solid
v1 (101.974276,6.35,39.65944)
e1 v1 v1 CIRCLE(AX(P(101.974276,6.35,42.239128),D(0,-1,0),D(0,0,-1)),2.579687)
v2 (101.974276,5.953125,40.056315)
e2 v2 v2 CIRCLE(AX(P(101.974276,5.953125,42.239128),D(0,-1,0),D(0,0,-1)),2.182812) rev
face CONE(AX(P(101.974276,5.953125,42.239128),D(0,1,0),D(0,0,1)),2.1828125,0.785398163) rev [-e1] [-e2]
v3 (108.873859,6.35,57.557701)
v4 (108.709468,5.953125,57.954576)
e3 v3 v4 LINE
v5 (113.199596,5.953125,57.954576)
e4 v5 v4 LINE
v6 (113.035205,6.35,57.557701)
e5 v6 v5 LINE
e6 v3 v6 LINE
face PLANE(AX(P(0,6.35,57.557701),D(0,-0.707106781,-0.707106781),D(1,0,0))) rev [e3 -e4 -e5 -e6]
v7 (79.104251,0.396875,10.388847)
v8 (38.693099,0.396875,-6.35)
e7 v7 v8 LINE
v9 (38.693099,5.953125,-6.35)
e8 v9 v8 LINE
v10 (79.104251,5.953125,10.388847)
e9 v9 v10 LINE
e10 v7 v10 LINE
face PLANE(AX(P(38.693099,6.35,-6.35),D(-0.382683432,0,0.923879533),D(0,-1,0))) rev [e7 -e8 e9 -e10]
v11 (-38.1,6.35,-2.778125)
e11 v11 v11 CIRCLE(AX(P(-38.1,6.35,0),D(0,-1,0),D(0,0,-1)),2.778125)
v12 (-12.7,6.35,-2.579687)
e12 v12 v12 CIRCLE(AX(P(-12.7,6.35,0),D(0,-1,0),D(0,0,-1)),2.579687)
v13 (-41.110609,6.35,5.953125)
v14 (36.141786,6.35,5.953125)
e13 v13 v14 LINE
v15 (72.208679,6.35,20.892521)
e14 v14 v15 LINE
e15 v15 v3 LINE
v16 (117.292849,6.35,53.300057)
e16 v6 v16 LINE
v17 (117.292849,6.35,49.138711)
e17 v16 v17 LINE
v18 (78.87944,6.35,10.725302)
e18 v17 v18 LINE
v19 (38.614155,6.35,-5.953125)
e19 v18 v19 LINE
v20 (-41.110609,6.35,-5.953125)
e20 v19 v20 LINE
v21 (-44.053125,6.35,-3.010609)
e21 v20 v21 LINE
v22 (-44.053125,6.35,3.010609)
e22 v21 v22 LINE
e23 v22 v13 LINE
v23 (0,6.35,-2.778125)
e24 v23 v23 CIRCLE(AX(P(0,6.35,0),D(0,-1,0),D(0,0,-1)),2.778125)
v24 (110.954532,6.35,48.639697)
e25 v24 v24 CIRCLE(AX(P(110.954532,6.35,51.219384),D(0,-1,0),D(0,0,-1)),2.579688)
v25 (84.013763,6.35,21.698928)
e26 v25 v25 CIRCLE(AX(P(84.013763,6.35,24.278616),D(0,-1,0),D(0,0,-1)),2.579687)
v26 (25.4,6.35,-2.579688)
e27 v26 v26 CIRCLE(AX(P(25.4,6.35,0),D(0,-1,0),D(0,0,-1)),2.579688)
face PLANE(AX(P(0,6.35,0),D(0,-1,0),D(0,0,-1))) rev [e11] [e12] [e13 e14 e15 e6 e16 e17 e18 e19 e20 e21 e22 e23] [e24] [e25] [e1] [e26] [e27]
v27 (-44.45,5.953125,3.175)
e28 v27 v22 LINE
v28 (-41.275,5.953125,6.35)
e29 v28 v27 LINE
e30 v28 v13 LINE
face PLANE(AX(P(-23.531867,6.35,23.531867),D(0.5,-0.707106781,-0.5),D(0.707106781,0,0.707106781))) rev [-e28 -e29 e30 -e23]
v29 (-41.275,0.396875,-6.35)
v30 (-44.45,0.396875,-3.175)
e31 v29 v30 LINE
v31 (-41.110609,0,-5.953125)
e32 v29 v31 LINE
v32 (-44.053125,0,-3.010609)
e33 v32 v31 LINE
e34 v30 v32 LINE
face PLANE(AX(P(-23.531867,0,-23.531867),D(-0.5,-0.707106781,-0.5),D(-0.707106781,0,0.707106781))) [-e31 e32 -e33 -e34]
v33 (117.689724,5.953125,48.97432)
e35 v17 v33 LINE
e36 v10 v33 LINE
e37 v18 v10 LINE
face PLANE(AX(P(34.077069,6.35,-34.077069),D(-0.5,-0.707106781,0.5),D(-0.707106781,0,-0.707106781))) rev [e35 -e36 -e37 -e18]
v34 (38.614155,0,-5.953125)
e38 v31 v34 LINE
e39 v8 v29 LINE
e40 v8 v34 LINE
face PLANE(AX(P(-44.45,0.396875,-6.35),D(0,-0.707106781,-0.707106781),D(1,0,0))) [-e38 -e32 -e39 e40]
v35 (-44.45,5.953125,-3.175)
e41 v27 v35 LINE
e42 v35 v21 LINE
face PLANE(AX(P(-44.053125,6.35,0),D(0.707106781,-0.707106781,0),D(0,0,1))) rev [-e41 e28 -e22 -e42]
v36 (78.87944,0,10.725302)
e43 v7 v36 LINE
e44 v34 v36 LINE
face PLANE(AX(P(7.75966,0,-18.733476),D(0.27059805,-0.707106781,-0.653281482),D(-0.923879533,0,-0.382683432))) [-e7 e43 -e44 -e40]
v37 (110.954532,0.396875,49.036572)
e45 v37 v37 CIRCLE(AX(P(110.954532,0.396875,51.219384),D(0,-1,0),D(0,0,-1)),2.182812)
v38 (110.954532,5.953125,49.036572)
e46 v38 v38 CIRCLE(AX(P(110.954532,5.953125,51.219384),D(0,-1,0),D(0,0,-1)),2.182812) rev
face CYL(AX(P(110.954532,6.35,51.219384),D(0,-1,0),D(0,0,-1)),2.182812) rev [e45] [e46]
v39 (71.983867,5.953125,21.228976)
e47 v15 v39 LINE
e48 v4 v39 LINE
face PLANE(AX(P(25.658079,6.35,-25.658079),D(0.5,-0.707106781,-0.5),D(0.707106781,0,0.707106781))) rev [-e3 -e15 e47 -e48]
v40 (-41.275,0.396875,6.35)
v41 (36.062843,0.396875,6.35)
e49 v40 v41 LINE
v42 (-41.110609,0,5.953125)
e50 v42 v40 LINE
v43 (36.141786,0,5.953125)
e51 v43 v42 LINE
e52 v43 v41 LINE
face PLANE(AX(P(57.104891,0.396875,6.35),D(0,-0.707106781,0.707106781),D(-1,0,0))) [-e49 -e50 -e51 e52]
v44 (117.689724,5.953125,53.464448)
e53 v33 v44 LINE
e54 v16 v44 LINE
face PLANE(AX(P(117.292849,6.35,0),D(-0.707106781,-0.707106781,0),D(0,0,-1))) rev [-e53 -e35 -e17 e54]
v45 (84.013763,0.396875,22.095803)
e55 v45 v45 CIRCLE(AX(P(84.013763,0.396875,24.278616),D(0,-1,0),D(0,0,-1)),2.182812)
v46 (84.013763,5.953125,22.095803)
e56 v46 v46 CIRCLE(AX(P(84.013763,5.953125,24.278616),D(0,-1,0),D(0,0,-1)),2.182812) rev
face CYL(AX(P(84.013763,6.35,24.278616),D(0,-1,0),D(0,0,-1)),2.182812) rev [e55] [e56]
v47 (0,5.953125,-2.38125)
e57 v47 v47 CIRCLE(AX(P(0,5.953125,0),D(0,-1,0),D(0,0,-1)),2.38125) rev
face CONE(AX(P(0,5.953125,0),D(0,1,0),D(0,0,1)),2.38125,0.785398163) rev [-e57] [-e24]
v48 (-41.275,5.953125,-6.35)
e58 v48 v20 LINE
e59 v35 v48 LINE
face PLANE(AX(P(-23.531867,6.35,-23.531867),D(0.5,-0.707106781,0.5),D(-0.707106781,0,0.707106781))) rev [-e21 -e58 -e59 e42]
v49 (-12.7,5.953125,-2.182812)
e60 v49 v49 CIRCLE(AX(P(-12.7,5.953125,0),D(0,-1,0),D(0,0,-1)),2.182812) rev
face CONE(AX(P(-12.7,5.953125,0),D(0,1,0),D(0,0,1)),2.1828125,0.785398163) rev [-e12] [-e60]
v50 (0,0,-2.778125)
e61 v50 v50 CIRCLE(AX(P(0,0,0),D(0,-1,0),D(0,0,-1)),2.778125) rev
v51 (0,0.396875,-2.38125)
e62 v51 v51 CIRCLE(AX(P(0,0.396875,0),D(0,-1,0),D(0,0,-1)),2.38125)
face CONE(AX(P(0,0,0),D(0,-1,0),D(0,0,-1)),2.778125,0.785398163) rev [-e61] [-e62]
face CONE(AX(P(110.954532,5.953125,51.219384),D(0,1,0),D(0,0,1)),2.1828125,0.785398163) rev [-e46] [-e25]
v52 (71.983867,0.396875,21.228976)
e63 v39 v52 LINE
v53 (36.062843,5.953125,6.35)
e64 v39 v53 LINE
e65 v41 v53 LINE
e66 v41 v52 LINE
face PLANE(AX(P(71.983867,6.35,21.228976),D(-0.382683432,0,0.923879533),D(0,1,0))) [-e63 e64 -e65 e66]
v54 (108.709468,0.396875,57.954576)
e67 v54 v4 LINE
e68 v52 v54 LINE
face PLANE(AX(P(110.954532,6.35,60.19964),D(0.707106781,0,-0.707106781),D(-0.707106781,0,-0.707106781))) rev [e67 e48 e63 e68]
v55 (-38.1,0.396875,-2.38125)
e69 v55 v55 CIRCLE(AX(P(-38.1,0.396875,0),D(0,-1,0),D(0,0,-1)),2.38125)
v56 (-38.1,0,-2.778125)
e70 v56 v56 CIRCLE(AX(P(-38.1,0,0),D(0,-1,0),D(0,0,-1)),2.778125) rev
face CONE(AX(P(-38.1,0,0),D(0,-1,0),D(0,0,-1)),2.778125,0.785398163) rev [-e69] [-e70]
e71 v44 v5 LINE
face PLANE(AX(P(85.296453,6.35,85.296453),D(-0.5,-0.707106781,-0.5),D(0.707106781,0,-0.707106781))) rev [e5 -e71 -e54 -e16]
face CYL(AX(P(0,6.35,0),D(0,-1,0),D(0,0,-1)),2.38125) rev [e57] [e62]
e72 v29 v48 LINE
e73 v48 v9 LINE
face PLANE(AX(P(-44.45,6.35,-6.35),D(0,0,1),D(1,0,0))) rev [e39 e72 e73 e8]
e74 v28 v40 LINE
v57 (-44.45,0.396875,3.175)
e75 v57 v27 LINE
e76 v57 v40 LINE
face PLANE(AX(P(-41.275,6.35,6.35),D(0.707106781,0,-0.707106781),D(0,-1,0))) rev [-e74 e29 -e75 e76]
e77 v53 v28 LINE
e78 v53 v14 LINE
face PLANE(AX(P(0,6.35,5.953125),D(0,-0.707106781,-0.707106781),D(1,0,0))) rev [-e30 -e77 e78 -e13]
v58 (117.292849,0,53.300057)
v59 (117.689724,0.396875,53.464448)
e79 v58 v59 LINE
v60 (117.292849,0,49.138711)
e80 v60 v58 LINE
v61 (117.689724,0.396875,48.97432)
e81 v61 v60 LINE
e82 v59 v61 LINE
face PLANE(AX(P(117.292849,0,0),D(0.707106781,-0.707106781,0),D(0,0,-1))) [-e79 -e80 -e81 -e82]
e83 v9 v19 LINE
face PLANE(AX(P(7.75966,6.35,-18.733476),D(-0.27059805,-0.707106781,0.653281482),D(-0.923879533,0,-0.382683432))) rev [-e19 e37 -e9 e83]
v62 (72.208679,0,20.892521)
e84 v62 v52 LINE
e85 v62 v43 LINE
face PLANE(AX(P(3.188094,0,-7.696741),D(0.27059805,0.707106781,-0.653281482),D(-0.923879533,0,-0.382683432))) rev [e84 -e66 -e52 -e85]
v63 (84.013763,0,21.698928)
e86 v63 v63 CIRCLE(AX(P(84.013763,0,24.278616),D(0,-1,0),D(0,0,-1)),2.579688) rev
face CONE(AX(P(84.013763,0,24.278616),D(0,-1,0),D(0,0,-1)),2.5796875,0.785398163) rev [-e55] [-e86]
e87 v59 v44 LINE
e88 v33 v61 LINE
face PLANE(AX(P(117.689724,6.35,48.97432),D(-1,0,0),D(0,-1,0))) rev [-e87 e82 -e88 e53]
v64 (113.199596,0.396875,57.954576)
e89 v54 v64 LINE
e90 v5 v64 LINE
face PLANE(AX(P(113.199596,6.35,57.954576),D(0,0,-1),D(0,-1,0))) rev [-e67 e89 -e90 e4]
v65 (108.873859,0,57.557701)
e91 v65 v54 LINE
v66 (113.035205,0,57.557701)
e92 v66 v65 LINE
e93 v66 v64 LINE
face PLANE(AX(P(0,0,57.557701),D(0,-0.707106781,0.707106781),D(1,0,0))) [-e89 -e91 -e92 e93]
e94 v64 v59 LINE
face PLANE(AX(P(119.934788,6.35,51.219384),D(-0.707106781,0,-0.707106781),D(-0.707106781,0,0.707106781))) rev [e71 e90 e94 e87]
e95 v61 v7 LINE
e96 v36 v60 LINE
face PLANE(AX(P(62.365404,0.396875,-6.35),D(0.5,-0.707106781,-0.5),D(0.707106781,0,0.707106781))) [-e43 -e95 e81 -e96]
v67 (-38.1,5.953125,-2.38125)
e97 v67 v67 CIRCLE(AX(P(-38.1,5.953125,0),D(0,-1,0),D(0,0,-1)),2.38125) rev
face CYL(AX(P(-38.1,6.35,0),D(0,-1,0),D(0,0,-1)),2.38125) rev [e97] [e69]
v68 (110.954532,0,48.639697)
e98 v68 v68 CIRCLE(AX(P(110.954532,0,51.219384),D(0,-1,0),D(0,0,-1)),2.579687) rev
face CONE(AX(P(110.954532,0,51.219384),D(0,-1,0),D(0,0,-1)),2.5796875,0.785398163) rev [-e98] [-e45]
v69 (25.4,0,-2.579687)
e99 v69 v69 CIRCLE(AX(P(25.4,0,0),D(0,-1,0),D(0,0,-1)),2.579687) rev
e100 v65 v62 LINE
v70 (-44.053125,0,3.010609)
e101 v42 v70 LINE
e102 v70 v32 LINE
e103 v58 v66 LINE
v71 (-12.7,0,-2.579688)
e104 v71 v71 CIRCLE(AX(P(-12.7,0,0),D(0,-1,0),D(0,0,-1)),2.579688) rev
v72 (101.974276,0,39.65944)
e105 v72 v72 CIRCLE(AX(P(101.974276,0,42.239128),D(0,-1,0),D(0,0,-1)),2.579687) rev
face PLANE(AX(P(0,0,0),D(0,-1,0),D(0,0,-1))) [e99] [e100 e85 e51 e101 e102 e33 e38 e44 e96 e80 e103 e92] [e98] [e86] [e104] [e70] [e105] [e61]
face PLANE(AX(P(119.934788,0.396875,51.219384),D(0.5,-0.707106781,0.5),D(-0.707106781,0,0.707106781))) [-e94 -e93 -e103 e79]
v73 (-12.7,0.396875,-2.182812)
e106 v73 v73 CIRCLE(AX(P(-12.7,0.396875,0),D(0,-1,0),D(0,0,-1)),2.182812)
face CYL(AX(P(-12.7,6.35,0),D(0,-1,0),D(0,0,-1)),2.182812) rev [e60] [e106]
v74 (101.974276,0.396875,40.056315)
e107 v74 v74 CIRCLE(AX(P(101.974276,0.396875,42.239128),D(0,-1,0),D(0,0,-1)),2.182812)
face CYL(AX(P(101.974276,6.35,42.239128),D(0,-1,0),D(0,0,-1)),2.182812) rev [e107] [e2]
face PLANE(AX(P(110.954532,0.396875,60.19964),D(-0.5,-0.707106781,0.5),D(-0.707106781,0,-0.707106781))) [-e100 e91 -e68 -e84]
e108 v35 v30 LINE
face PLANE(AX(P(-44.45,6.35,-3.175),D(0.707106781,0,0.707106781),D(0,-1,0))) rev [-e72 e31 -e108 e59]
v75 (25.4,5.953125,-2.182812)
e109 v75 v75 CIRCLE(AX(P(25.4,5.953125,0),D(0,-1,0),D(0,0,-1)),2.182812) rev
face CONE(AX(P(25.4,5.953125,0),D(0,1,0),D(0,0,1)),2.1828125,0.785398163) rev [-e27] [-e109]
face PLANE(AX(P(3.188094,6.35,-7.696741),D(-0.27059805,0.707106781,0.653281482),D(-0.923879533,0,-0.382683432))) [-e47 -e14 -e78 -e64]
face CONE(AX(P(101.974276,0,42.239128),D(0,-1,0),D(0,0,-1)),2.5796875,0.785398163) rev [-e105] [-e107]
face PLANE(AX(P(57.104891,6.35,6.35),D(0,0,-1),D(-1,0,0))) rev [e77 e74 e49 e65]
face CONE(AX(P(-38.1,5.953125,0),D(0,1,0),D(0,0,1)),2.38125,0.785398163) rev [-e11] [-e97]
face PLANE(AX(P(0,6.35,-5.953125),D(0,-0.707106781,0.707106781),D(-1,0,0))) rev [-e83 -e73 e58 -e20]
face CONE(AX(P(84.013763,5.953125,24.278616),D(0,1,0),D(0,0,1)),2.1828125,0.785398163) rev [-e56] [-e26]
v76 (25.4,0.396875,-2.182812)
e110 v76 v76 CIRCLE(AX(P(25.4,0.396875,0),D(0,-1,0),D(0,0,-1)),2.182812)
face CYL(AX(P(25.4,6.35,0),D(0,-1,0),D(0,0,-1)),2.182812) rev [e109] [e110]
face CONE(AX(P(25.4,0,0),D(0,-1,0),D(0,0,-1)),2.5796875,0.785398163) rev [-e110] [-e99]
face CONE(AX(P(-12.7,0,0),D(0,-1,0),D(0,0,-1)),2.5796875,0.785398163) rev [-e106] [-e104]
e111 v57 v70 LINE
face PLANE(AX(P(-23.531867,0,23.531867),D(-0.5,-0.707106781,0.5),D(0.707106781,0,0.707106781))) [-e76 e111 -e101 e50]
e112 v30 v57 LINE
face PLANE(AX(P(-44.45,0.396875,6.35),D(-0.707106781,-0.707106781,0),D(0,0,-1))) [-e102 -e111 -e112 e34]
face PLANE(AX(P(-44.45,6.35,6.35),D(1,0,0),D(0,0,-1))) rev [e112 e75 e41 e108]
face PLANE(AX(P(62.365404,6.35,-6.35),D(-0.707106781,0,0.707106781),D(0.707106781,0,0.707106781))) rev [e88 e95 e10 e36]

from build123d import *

# Parameters (mm, degrees)
SKETCH1_R           = 2.38125
SKETCH1_R_2         = 2.1828125
BOSS_EXTRUDE1_DEPTH = 6.35
CHAMFER1_SIZE       = 3.175
CHAMFER2_SIZE       = 0.396875


with BuildPart() as part:
    # Sketch1 → Boss-Extrude1 (new body)
    with BuildSketch(Plane(origin=(0, 0, 0), x_dir=(1, 0, 0), z_dir=(0, 1, 0))):
        Polygon((-44.45, 6.35), (62.365403734, 6.35), (119.934787808, -51.219384074), (110.954531687, -60.199640195), (57.104891492, -6.35), (-44.45, -6.35), align=None)
        with Locations(Location((-38.1, 0, 0), (0, 0, 270))):
            Circle(SKETCH1_R, mode=Mode.SUBTRACT)
        with Locations(Location((0, 0, 0), (0, 0, 270))):
            Circle(SKETCH1_R, mode=Mode.SUBTRACT)
        with Locations(Location((110.954531687, -51.219384074, 0), (0, 0, 270))):
            Circle(SKETCH1_R_2, mode=Mode.SUBTRACT)
        with Locations(Location((101.974275566, -42.239127953, 0), (0, 0, 270))):
            Circle(SKETCH1_R_2, mode=Mode.SUBTRACT)
        with Locations(Location((-12.7, 0, 0), (0, 0, 270))):
            Circle(SKETCH1_R_2, mode=Mode.SUBTRACT)
        with Locations(Location((25.4, 0, 0), (0, 0, 270))):
            Circle(SKETCH1_R_2, mode=Mode.SUBTRACT)
        with Locations(Location((84.013763324, -24.27861571, 0), (0, 0, 270))):
            Circle(SKETCH1_R_2, mode=Mode.SUBTRACT)
    extrude(amount=BOSS_EXTRUDE1_DEPTH)

    # Fillet1
    # the kernel refuses this chamfer: 50.8 mm, written as the material it adds along each edge
    with BuildSketch(Plane(origin=(57.104891492, 0, 6.35), x_dir=(0.7306772036716535, 0, 0.6827230946984092), z_dir=(0, 1, 0))) as fillet1_piece_1:
        with BuildLine():
            Line((22.93255988, 0), (-17.277556946, -15.079400804))
            Line((-17.277556946, -15.079400804), (-17.97120361, -14.337032765))
            ThreePointArc((-17.97120361, -14.337032765), (-9.066978051, -7.081424312), (-0.693646664, 0.742368039))
            Line((-0.693646664, 0.742368039), (0.034451214, 1.015415734))
            ThreePointArc((0.034451214, 1.015415734), (11.487547245, 0.626832956), (22.967011094, 1.015415734))
            Line((22.967011094, 1.015415734), (22.93255988, 0))
        make_face()
    extrude(amount=6.35)

    # Fillet2
    # the kernel refuses this chamfer: 57.15 mm, written as the material it takes off along each edge
    with BuildSketch(Plane(origin=(62.365403734, -64.497824661, -6.35), x_dir=(0.7306772036716533, 0, 0.6827230946984093), z_dir=(0, 1, 0))) as fillet2_piece_1:
        with BuildLine():
            Line((25.799129864, 0), (-19.437251564, -16.964325904))
            Line((-19.437251564, -16.964325904), (-20.217604061, -16.129161861))
            ThreePointArc((-20.217604061, -16.129161861), (-10.200350307, -7.966602351), (-0.780352497, 0.835164044))
            Line((-0.780352497, 0.835164044), (0.038757616, 1.142342701))
            ThreePointArc((0.038757616, 1.142342701), (12.923490651, 0.705187075), (25.837887481, 1.142342701))
            Line((25.837887481, 1.142342701), (25.799129864, 0))
        make_face()
    extrude(amount=135.345649322, mode=Mode.SUBTRACT)

    # Chamfer1
    chamfer1_edges = [part.edges().sort_by_distance(p)[0] for p in [
        (-44.45, 3.175, -6.35),
        (119.934787808, 3.175, 51.219384074),
        (110.954531687, 3.175, 60.199640195),
        (-44.45, 3.175, 6.35),
    ]]
    chamfer(chamfer1_edges, length=CHAMFER1_SIZE)

    # Chamfer2
    chamfer2_edges = [part.edges().sort_by_distance(p)[0] for p in [
        (0, 0, -2.38125),
        (0, 6.35, -2.38125),
        (-38.1, 0, -2.38125),
        (-38.1, 6.35, -2.38125),
        (110.954531687, 0, 49.036571574),
        (110.954531687, 6.35, 49.036571574),
        (101.974275566, 0, 40.056315453),
        (101.974275566, 6.35, 40.056315453),
        (-12.7, 0, -2.1828125),
        (-12.7, 6.35, -2.1828125),
        (25.4, 0, -2.1828125),
        (25.4, 6.35, -2.1828125),
        (84.013763324, 0, 22.09580321),
        (84.013763324, 6.35, 22.09580321),
        (90.346667332, 0, 39.59177584),
        (90.346667332, 6.35, 39.59177584),
        (54.023354766, 0, 13.789487758),
        (54.023354766, 6.35, 13.789487758),
        (-1.290950678, 0, -6.35),
        (-1.290950678, 6.35, -6.35),
        (58.898674917, 0, 2.019423728),
        (58.898674917, 6.35, 2.019423728),
        (-44.45, 0, 0),
        (-44.45, 6.35, 0),
        (98.396987484, 0, 29.681583749),
        (115.444659748, 0, 55.709512134),
        (-2.606078738, 0, 6.35),
        (117.689723778, 0, 51.219384074),
        (110.954531687, 0, 57.954576164),
        (-42.8625, 0, 4.7625),
        (-42.8625, 0, -4.7625),
        (98.396987484, 6.35, 29.681583749),
        (-2.606078738, 6.35, 6.35),
        (115.444659748, 6.35, 55.709512134),
        (117.689723778, 6.35, 51.219384074),
        (110.954531687, 6.35, 57.954576164),
        (-42.8625, 6.35, 4.7625),
        (-42.8625, 6.35, -4.7625),
    ]]
    chamfer(chamfer2_edges, length=CHAMFER2_SIZE)


solid = part.part
